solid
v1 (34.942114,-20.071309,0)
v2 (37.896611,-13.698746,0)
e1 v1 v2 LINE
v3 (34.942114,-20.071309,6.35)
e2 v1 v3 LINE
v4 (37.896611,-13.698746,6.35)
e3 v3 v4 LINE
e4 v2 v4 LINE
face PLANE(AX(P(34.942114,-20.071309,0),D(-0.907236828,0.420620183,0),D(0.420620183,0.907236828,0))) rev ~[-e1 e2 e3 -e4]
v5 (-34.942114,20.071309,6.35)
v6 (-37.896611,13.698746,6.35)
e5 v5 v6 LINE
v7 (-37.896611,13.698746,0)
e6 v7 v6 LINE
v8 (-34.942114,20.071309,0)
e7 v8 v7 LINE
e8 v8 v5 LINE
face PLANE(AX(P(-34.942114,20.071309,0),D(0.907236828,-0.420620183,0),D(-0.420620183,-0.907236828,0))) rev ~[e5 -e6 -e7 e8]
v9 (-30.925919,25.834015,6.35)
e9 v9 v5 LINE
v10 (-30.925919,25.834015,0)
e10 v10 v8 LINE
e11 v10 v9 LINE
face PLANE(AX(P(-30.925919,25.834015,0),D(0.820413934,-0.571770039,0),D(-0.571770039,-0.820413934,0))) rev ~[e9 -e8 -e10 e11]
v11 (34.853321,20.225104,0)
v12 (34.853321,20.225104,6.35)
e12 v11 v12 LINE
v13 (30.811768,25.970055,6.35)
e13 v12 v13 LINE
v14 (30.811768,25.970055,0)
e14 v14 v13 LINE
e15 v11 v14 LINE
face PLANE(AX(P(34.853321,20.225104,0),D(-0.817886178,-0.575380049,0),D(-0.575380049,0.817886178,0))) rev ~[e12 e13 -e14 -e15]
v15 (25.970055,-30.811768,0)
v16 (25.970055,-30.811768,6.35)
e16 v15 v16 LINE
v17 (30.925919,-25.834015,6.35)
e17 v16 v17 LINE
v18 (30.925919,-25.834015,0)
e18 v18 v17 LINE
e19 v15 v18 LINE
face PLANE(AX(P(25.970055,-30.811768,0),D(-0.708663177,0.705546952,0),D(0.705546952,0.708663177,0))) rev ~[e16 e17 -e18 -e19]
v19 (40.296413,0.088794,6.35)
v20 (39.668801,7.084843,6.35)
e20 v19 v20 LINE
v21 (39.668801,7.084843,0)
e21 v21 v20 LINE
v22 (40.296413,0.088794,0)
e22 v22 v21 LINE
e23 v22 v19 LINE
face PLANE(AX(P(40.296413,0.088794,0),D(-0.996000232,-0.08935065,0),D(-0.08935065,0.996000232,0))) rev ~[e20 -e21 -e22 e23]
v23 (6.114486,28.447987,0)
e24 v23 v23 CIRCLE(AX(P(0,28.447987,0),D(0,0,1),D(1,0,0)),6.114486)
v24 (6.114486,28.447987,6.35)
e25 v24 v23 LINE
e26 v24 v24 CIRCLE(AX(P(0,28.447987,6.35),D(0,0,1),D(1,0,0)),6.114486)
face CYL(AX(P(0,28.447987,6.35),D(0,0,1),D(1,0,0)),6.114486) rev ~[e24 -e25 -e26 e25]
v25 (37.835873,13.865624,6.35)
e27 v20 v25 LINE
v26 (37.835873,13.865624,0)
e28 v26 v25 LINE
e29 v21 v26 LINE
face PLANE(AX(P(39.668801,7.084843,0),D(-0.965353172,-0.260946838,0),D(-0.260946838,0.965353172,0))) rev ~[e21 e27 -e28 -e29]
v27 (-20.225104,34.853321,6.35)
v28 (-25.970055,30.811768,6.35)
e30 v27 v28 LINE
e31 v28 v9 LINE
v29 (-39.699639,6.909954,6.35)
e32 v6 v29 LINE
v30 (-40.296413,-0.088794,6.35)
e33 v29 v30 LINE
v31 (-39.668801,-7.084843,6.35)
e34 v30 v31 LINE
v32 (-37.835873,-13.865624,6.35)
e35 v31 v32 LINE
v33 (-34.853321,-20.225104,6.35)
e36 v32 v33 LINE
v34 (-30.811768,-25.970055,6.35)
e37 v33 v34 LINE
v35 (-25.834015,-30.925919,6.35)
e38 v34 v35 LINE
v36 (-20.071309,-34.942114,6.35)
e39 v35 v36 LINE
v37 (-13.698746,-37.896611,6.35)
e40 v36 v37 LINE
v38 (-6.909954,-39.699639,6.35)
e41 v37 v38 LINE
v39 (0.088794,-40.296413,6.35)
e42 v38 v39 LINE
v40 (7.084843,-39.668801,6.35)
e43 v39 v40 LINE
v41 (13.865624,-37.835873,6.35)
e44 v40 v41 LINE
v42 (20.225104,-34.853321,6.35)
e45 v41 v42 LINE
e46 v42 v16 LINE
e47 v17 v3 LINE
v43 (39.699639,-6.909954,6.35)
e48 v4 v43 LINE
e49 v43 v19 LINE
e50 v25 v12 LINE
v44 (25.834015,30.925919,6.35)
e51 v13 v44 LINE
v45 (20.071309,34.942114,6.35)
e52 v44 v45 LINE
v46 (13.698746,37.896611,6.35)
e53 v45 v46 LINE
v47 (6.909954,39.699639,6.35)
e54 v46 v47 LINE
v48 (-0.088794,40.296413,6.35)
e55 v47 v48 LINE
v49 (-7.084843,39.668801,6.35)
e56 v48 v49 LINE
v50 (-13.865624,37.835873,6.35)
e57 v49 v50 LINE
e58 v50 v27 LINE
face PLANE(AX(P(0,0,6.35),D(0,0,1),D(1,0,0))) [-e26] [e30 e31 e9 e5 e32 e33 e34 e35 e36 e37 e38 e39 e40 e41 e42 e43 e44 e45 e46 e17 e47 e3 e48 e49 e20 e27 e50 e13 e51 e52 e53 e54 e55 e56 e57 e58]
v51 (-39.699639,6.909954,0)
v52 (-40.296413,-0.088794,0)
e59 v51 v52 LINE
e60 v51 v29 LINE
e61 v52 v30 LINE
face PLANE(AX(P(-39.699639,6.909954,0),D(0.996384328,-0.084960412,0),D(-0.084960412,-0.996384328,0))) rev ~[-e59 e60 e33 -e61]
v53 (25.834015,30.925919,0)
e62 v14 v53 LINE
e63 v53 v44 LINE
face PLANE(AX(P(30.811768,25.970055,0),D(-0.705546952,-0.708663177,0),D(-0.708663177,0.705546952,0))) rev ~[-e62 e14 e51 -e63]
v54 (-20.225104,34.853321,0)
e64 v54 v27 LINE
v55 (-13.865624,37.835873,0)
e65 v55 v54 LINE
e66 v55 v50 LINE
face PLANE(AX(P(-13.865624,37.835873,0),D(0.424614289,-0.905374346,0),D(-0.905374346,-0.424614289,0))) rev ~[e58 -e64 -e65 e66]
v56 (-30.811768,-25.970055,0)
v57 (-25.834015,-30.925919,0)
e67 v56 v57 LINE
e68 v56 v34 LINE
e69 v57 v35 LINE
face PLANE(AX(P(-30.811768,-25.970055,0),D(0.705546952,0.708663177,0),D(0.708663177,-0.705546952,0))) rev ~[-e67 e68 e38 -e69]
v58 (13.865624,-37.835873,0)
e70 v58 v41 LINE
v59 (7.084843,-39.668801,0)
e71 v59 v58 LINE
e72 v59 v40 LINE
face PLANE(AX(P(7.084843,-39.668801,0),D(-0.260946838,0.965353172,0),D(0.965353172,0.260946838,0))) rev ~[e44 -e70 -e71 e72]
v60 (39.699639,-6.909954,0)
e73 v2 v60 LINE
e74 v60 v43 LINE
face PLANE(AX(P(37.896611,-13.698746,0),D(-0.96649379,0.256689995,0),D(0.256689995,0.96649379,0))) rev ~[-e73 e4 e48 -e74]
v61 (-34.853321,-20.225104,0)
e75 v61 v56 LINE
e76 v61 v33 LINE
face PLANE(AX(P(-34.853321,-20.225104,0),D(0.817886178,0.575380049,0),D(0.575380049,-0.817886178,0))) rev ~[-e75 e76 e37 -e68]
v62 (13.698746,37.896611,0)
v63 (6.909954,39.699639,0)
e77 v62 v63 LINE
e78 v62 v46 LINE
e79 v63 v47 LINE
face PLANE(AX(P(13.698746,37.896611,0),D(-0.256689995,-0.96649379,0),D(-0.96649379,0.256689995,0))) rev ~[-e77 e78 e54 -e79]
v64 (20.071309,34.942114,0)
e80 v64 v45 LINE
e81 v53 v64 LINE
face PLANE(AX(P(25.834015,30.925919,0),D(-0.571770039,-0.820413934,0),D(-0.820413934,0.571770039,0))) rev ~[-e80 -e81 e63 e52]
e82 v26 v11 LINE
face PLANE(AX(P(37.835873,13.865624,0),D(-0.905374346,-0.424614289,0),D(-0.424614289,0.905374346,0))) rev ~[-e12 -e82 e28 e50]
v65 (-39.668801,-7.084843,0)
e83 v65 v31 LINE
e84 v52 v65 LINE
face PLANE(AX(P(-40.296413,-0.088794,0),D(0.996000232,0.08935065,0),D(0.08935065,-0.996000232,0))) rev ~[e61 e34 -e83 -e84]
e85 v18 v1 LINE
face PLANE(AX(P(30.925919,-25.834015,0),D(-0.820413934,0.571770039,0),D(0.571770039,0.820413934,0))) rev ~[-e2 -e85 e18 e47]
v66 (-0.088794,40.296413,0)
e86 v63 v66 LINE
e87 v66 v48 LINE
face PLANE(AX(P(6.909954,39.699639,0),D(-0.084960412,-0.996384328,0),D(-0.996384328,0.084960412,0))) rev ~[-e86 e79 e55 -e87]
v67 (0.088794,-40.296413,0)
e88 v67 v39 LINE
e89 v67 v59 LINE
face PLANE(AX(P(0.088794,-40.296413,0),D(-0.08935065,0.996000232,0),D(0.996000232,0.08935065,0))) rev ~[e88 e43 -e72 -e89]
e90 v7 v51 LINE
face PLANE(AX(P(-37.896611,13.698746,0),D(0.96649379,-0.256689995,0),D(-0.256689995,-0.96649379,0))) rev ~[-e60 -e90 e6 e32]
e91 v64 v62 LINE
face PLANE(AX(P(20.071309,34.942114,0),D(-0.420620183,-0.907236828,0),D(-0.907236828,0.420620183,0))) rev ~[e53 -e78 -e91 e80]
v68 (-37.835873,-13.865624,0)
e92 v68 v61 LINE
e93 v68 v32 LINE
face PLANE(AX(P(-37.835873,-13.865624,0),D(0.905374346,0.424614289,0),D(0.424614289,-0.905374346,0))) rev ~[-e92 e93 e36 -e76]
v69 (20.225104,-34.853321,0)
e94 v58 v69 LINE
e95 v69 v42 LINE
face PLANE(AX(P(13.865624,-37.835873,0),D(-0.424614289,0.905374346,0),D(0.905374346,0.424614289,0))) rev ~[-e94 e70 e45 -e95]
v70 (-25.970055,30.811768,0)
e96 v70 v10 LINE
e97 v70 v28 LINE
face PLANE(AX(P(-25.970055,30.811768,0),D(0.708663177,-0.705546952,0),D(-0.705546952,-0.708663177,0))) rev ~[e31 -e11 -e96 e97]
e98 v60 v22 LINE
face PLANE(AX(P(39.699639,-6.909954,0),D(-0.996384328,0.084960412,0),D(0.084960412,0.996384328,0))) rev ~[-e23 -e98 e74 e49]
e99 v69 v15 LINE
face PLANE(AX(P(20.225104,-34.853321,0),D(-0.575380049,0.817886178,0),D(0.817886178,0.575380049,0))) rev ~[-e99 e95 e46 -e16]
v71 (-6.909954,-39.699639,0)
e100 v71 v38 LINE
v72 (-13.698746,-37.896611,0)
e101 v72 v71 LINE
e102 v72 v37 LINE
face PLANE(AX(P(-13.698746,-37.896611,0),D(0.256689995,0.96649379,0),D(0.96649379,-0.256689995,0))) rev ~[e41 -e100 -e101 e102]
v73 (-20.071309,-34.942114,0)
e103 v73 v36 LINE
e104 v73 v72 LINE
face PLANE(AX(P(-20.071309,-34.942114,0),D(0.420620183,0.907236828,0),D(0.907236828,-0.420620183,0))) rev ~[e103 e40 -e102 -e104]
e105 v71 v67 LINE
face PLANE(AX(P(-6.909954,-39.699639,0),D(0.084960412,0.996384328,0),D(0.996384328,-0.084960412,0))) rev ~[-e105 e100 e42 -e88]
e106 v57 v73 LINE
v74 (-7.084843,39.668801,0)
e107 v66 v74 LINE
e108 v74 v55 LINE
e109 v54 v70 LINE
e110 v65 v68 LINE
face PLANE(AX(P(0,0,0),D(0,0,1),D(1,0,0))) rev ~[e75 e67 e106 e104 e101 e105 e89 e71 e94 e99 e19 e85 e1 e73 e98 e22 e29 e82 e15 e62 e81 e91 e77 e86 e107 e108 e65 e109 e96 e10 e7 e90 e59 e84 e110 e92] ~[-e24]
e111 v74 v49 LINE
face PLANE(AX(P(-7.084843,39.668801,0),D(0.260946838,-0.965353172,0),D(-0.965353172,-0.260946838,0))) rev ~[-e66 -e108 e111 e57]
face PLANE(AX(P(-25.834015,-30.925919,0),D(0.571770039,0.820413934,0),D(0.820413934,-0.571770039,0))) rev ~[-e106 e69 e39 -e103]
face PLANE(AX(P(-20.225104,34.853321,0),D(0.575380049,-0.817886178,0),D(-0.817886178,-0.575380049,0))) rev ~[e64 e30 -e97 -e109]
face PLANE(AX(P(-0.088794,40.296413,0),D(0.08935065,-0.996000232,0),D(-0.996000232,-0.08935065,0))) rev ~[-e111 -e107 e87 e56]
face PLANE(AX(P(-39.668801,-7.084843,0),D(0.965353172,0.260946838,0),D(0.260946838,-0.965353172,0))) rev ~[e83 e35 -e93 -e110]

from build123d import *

# Parameters (mm, degrees)
F1_DEPTH = 6.35
F4_R     = 6.1144864015
F5_DEPTH = 6.351


# Not quite as in the source:
# - the program builds the solid bodies; features that only make, move or delete a surface that nothing else refers to are left out


with BuildPart() as f1:
    # F0 (on Top) → F1 (new body)
    with BuildSketch(Plane.XY):
        Polygon((37.8358727575, 13.8656235676), (34.8533205688, 20.2251039445), (30.8117678713, 25.9700547725), (25.8340151985, 30.9259186276), (20.0713090466, 34.9421140946), (13.6987463258, 37.8966111063), (6.9099541298, 39.6996387661), (-0.0887935258, 40.2964129911), (-7.084843235, 39.6688010983), (-13.8656235676, 37.8358727575), (-20.2251039445, 34.8533205688), (-25.9700547725, 30.8117678713), (-30.9259186276, 25.8340151985), (-34.9421140946, 20.0713090466), (-37.8966111063, 13.6987463258), (-39.6996387661, 6.9099541298), (-40.2964129911, -0.0887935258), (-39.6688010983, -7.084843235), (-37.8358727575, -13.8656235676), (-34.8533205688, -20.2251039445), (-30.8117678713, -25.9700547725), (-25.8340151985, -30.9259186276), (-20.0713090466, -34.9421140946), (-13.6987463258, -37.8966111063), (-6.9099541298, -39.6996387661), (0.0887935258, -40.2964129911), (7.084843235, -39.6688010983), (13.8656235676, -37.8358727575), (20.2251039445, -34.8533205688), (25.9700547725, -30.8117678713), (30.9259186276, -25.8340151985), (34.9421140946, -20.0713090466), (37.8966111063, -13.6987463258), (39.6996387661, -6.9099541298), (40.2964129911, 0.0887935258), (39.6688010983, 7.084843235), align=None)
    extrude(amount=F1_DEPTH)

    # F4 (on face) → F5 (cut, through all)
    with BuildSketch(Plane.XY.offset(6.35)):
        with Locations((0, 28.4479867001)):
            Circle(F4_R)
    extrude(amount=-F5_DEPTH, mode=Mode.SUBTRACT)


solid = f1.part
